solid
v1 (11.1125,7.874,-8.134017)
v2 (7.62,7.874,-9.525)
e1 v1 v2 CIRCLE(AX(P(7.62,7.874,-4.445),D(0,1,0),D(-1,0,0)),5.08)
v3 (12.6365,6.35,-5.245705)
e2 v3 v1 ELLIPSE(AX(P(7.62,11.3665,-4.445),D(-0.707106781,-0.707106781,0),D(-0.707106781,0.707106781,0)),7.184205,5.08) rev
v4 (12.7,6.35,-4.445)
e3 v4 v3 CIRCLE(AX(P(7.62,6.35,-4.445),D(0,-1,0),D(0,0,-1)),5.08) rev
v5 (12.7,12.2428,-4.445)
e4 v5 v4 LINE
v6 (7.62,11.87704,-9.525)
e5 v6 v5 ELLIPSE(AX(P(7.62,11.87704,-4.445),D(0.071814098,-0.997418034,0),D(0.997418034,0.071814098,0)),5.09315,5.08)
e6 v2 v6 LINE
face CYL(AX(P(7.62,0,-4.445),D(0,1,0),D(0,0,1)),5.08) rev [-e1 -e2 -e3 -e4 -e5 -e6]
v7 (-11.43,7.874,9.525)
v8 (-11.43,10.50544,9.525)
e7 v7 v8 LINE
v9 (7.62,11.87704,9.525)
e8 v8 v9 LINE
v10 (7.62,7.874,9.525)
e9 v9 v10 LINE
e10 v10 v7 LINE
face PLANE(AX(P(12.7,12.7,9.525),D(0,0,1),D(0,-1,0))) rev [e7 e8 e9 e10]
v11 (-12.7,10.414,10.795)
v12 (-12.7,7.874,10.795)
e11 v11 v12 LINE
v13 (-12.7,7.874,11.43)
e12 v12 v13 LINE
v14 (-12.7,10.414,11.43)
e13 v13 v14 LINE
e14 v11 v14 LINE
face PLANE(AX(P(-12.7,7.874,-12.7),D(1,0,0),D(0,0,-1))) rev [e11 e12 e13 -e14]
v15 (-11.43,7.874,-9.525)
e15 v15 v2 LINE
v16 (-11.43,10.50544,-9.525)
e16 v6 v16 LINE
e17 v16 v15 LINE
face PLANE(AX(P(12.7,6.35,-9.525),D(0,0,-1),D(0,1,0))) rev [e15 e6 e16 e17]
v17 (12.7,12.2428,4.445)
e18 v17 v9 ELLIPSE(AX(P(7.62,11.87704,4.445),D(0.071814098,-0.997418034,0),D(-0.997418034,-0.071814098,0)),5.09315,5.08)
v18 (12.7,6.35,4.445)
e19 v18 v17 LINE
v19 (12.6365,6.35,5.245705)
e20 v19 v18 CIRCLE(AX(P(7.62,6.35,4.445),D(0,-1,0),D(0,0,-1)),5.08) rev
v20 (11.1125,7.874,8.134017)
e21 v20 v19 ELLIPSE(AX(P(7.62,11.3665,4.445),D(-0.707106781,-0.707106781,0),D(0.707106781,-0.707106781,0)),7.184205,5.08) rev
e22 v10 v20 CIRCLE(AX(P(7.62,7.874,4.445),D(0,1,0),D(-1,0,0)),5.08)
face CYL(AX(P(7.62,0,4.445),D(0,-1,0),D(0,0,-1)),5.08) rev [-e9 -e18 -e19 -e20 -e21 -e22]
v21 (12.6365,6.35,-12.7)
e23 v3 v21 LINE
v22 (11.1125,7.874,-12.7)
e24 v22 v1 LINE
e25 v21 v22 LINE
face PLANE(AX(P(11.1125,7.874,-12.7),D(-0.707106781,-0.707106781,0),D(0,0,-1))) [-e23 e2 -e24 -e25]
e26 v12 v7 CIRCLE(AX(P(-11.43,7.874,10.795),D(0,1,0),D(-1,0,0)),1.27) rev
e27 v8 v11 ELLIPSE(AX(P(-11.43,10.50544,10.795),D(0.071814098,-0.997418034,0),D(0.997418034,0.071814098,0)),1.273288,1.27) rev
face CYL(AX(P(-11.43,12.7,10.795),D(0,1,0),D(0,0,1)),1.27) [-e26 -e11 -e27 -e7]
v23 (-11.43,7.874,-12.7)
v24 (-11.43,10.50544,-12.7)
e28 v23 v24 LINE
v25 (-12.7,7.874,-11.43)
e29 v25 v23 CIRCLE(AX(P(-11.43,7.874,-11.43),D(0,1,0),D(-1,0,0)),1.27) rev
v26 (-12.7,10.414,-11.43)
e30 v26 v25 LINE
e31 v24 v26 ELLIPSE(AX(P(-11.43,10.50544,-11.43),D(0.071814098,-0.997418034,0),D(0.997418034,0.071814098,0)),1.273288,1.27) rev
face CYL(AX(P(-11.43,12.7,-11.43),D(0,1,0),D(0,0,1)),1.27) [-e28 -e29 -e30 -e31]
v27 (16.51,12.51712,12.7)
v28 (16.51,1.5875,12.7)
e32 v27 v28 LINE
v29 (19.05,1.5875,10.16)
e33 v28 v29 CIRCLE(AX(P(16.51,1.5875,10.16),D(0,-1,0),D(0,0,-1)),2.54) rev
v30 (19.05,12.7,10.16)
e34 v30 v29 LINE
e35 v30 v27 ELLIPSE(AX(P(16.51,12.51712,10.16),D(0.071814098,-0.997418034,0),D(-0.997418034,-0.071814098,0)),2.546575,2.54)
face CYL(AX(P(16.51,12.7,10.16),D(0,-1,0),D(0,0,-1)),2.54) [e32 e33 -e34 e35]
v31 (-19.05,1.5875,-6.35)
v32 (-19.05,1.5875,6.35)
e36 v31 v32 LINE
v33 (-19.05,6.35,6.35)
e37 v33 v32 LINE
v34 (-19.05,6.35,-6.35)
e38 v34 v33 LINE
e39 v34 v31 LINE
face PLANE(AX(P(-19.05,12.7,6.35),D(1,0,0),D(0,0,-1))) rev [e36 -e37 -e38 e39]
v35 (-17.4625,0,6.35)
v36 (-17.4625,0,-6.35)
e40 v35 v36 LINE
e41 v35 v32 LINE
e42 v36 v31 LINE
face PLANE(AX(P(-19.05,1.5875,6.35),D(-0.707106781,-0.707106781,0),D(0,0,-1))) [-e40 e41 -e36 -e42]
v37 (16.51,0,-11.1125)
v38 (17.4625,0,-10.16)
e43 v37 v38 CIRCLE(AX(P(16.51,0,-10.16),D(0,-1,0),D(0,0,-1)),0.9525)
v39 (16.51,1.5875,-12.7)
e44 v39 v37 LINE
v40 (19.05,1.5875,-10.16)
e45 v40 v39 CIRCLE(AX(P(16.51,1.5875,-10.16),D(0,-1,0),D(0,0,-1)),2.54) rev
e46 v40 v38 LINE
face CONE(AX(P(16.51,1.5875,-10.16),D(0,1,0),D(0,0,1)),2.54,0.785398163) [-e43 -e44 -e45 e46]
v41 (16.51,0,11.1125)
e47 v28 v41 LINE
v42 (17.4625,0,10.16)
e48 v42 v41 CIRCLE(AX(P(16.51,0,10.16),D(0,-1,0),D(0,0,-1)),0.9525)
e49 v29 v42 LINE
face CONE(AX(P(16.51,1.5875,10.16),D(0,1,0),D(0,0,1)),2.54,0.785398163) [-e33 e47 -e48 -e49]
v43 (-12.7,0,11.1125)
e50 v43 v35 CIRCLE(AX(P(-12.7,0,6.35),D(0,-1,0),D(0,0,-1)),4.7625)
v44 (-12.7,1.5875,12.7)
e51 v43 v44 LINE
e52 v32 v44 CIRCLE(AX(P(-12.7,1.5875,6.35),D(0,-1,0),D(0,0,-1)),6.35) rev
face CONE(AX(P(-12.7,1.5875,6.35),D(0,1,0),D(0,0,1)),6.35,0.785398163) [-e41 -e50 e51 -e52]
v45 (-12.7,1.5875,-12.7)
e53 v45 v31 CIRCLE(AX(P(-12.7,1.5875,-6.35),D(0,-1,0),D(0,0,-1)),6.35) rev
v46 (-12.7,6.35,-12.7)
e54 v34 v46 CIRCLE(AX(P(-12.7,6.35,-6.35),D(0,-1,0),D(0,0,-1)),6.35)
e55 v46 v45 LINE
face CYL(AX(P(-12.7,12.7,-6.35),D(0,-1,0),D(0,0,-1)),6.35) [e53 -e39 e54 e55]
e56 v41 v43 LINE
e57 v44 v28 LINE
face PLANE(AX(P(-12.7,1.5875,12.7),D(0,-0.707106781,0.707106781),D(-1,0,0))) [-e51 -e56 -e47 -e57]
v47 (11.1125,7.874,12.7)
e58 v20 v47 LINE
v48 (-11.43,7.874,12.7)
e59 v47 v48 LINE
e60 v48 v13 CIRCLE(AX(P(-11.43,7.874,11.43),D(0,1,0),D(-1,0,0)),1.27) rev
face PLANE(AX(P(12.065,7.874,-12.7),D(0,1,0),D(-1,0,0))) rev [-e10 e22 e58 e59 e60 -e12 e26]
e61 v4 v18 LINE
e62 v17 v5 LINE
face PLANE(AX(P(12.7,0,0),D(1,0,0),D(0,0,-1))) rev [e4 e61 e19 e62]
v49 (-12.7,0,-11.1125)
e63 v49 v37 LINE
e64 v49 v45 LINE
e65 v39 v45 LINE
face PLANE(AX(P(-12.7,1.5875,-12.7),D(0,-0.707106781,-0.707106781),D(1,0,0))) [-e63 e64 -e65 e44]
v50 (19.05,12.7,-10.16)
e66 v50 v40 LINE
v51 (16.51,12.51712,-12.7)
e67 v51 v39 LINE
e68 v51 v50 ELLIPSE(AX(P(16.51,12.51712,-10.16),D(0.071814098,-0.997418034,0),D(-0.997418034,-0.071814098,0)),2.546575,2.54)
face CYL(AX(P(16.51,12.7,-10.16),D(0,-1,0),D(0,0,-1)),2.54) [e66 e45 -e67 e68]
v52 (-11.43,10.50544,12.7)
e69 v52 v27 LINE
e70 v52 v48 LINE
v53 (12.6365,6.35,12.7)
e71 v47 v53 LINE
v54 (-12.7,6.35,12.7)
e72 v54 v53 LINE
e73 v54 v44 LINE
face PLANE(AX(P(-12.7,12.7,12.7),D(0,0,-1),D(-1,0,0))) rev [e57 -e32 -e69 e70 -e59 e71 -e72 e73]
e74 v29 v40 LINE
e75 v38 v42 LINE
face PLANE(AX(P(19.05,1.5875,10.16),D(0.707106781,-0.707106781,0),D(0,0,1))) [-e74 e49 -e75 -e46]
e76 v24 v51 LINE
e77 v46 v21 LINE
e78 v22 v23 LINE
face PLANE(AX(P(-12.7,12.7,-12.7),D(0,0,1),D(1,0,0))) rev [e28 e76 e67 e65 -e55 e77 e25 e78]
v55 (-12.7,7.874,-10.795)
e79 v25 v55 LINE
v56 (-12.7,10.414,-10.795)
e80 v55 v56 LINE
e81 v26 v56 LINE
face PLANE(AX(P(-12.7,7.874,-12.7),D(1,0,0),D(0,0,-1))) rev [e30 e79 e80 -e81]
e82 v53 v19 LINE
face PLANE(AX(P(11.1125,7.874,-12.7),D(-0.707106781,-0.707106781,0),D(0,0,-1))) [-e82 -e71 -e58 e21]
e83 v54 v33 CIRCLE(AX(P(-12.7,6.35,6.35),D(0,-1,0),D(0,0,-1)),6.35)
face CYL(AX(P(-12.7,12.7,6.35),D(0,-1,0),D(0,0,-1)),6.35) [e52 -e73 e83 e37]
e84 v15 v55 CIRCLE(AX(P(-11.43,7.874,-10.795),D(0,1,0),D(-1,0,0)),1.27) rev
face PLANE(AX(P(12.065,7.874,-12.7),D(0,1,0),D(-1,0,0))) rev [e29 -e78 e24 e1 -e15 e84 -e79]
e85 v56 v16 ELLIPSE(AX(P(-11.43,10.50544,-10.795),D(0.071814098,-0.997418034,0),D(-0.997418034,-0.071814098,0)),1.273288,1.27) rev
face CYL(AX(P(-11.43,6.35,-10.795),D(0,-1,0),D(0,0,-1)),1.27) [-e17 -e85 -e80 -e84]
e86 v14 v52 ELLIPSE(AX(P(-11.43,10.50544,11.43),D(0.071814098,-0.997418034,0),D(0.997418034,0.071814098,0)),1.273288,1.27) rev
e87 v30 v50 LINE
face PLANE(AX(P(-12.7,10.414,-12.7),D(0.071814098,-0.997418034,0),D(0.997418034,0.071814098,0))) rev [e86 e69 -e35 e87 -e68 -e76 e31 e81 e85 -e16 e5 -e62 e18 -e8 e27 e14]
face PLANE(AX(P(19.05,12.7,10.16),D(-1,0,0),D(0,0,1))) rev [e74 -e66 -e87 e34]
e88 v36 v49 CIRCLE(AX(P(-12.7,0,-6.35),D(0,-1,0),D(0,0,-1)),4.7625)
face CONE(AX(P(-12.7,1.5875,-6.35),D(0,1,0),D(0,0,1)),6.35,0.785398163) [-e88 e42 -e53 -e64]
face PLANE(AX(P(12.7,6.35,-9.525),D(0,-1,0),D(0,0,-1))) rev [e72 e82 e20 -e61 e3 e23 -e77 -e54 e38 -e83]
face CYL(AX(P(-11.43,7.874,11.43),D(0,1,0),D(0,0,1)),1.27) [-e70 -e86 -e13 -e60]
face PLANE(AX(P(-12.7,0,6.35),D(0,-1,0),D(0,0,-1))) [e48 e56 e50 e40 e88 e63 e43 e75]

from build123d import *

# Parameters (mm, degrees)
BOSS_EXTRUDE1_DEPTH = 12.7
SKETCH2_W           = 19.05
SKETCH2_H           = 6.35
CUT_EXTRUDE1_DEPTH  = 31.75
CUT_EXTRUDE2_DEPTH  = 35.195796525
CHAMFER3_SIZE       = 1.5875
FILLET1_R           = 1.27
FILLET2_R           = 5.08


with BuildPart() as part:
    # Sketch1 → Boss-Extrude1 (new body)
    with BuildSketch(Plane(origin=(0, 0, 0), x_dir=(1, 0, 0), z_dir=(0, 1, 0))):
        with BuildLine():
            Line((-12.7, -12.7), (16.51, -12.7))
            ThreePointArc((16.51, -12.7), (18.306051224, -11.956051224), (19.05, -10.16))
            Line((19.05, -10.16), (19.05, 10.16))
            ThreePointArc((19.05, 10.16), (18.306051224, 11.956051224), (16.51, 12.7))
            Line((16.51, 12.7), (-12.7, 12.7))
            ThreePointArc((-12.7, 12.7), (-17.190128061, 10.840128061), (-19.05, 6.35))
            Line((-19.05, 6.35), (-19.05, -6.35))
            ThreePointArc((-19.05, -6.35), (-17.190128061, -10.840128061), (-12.7, -12.7))
        make_face()
    extrude(amount=BOSS_EXTRUDE1_DEPTH)

    # Sketch2 → Cut-Extrude1 (cut)
    with BuildSketch(Plane.ZY.offset(19.05)):
        with Locations((0, 9.525)):
            Rectangle(SKETCH2_W, SKETCH2_H)
    extrude(amount=-CUT_EXTRUDE1_DEPTH, mode=Mode.SUBTRACT)

    # Sketch3 → Cut-Extrude2 (cut, through all)
    with BuildSketch(Plane.XY.offset(12.7)):
        Polygon((19.05, 12.7), (-19.05, 12.7), (-19.05, 6.35), (12.065, 6.35), (12.7, 6.35), (12.7, 6.985), (12.7, 7.239), (12.7, 7.874), (12.065, 7.874), (-12.7, 7.874), (-12.7, 10.414), align=None)
    extrude(amount=-CUT_EXTRUDE2_DEPTH, mode=Mode.SUBTRACT)

    # Chamfer3
    # the kernel refuses this chamfer: 1.5875 mm, written as the material it adds along each edge
    with BuildSketch(Plane(origin=(12.7, 7.874, 12.7), x_dir=(0.027495876610588915, -0.9996219169112966, 0), z_dir=(0, 0, -1))) as chamfer3_piece_1:
        Polygon((CHAMFER3_SIZE * 0.999621916911, CHAMFER3_SIZE * 0.0274958766106), (-CHAMFER3_SIZE * 0.0274958766106, CHAMFER3_SIZE * 0.999621916911), (0, 0), align=None)
    extrude(amount=3.175)
    with BuildSketch(Plane(origin=(12.7, 7.874, -9.525), x_dir=(-0.9996219169112968, 0.027495876610586185, 0), z_dir=(0, 0, -1))) as chamfer3_piece_2:
        Polygon((CHAMFER3_SIZE * 0.999621916911, -CHAMFER3_SIZE * 0.0274958766106), (-CHAMFER3_SIZE * 0.0274958766106, -CHAMFER3_SIZE * 0.999621916911), (0, 0), align=None)
    extrude(amount=3.175)
    # the kernel refuses this chamfer: 1.5875 mm, written as the material it takes off along each edge
    with BuildSketch(Plane(origin=(-12.7, 0, 12.7), x_dir=(0, 0.9996219169112966, 0.027495876610586743), z_dir=(1, 0, 0)), Plane(origin=(16.51, 0, -12.7), x_dir=(0, 0.9996219169112966, -0.027495876610586743), z_dir=(-1, 0, 0))) as chamfer3_2_piece_1:
        Polygon((CHAMFER3_SIZE * 0.999621916911, -CHAMFER3_SIZE * 0.0274958766106), (-CHAMFER3_SIZE * 0.0274958766106, -CHAMFER3_SIZE * 0.999621916911), (0, 0), align=None)
    extrude(amount=29.21, mode=Mode.SUBTRACT)
    with BuildSketch(Plane(origin=(16.51, 0, 10.16), x_dir=(0, 0, 1), z_dir=(-1, 0, 0))) as chamfer3_2_piece_2:
        Polygon((2.54 - CHAMFER3_SIZE, 0), (2.54, CHAMFER3_SIZE), (2.54, 0), align=None)
    revolve(axis=Axis((16.51, 0, 10.16), (0, 1, 0)), revolution_arc=90, mode=Mode.SUBTRACT)
    with BuildSketch(Plane(origin=(19.05, 0, 10.16), x_dir=(0.027495876610585654, 0.9996219169112966, 0), z_dir=(0, 0, -1))) as chamfer3_2_piece_3:
        Polygon((CHAMFER3_SIZE * 0.999621916911, -CHAMFER3_SIZE * 0.0274958766106), (-CHAMFER3_SIZE * 0.0274958766106, -CHAMFER3_SIZE * 0.999621916911), (0, 0), align=None)
    extrude(amount=20.32, mode=Mode.SUBTRACT)
    with BuildSketch(Plane(origin=(16.51, 0, -10.16), x_dir=(1, 0, 0), z_dir=(0, 0, 1))) as chamfer3_2_piece_4:
        Polygon((2.54, CHAMFER3_SIZE), (2.54 - CHAMFER3_SIZE, 0), (2.54, 0), align=None)
    revolve(axis=Axis((16.51, 0, -10.16), (0, 1, 0)), revolution_arc=90, mode=Mode.SUBTRACT)
    with BuildSketch(Plane(origin=(-12.7, 0, -6.35), x_dir=(0, 0, -1), z_dir=(1, 0, 0))) as chamfer3_2_piece_5:
        Polygon((6.35, CHAMFER3_SIZE), (6.35 - CHAMFER3_SIZE, 0), (6.35, 0), align=None)
    revolve(axis=Axis((-12.7, 0, -6.35), (0, 1, 0)), revolution_arc=90, mode=Mode.SUBTRACT)
    with BuildSketch(Plane(origin=(-12.7, 0, 6.35), x_dir=(-1, 0, 0), z_dir=(0, 0, -1))) as chamfer3_2_piece_6:
        Polygon((6.35, CHAMFER3_SIZE), (6.35 - CHAMFER3_SIZE, 0), (6.35, 0), align=None)
    revolve(axis=Axis((-12.7, 0, 6.35), (0, 1, 0)), revolution_arc=90, mode=Mode.SUBTRACT)
    with BuildSketch(Plane(origin=(-19.05, 0, -6.35), x_dir=(-0.027495876610585654, 0.9996219169112966, 0), z_dir=(0, 0, 1))) as chamfer3_2_piece_7:
        Polygon((CHAMFER3_SIZE * 0.999621916911, -CHAMFER3_SIZE * 0.0274958766106), (-CHAMFER3_SIZE * 0.0274958766106, -CHAMFER3_SIZE * 0.999621916911), (0, 0), align=None)
    extrude(amount=12.7, mode=Mode.SUBTRACT)

    # Fillet1
    fillet1_edges = [part.edges().sort_by_distance(p)[0] for p in [
        (-12.7, 9.144, -9.525),
        (-12.7, 9.144, 9.525),
        (-12.7, 9.144, -12.7),
        (-12.7, 9.144, 12.7),
    ]]
    fillet(fillet1_edges, radius=FILLET1_R)

    # Fillet2
    fillet2_edges = [part.edges().sort_by_distance(p)[0] for p in [
        (12.7, 9.2964, -9.525),
        (12.7, 9.2964, 9.525),
    ]]
    fillet(fillet2_edges, radius=FILLET2_R)


solid = part.part
